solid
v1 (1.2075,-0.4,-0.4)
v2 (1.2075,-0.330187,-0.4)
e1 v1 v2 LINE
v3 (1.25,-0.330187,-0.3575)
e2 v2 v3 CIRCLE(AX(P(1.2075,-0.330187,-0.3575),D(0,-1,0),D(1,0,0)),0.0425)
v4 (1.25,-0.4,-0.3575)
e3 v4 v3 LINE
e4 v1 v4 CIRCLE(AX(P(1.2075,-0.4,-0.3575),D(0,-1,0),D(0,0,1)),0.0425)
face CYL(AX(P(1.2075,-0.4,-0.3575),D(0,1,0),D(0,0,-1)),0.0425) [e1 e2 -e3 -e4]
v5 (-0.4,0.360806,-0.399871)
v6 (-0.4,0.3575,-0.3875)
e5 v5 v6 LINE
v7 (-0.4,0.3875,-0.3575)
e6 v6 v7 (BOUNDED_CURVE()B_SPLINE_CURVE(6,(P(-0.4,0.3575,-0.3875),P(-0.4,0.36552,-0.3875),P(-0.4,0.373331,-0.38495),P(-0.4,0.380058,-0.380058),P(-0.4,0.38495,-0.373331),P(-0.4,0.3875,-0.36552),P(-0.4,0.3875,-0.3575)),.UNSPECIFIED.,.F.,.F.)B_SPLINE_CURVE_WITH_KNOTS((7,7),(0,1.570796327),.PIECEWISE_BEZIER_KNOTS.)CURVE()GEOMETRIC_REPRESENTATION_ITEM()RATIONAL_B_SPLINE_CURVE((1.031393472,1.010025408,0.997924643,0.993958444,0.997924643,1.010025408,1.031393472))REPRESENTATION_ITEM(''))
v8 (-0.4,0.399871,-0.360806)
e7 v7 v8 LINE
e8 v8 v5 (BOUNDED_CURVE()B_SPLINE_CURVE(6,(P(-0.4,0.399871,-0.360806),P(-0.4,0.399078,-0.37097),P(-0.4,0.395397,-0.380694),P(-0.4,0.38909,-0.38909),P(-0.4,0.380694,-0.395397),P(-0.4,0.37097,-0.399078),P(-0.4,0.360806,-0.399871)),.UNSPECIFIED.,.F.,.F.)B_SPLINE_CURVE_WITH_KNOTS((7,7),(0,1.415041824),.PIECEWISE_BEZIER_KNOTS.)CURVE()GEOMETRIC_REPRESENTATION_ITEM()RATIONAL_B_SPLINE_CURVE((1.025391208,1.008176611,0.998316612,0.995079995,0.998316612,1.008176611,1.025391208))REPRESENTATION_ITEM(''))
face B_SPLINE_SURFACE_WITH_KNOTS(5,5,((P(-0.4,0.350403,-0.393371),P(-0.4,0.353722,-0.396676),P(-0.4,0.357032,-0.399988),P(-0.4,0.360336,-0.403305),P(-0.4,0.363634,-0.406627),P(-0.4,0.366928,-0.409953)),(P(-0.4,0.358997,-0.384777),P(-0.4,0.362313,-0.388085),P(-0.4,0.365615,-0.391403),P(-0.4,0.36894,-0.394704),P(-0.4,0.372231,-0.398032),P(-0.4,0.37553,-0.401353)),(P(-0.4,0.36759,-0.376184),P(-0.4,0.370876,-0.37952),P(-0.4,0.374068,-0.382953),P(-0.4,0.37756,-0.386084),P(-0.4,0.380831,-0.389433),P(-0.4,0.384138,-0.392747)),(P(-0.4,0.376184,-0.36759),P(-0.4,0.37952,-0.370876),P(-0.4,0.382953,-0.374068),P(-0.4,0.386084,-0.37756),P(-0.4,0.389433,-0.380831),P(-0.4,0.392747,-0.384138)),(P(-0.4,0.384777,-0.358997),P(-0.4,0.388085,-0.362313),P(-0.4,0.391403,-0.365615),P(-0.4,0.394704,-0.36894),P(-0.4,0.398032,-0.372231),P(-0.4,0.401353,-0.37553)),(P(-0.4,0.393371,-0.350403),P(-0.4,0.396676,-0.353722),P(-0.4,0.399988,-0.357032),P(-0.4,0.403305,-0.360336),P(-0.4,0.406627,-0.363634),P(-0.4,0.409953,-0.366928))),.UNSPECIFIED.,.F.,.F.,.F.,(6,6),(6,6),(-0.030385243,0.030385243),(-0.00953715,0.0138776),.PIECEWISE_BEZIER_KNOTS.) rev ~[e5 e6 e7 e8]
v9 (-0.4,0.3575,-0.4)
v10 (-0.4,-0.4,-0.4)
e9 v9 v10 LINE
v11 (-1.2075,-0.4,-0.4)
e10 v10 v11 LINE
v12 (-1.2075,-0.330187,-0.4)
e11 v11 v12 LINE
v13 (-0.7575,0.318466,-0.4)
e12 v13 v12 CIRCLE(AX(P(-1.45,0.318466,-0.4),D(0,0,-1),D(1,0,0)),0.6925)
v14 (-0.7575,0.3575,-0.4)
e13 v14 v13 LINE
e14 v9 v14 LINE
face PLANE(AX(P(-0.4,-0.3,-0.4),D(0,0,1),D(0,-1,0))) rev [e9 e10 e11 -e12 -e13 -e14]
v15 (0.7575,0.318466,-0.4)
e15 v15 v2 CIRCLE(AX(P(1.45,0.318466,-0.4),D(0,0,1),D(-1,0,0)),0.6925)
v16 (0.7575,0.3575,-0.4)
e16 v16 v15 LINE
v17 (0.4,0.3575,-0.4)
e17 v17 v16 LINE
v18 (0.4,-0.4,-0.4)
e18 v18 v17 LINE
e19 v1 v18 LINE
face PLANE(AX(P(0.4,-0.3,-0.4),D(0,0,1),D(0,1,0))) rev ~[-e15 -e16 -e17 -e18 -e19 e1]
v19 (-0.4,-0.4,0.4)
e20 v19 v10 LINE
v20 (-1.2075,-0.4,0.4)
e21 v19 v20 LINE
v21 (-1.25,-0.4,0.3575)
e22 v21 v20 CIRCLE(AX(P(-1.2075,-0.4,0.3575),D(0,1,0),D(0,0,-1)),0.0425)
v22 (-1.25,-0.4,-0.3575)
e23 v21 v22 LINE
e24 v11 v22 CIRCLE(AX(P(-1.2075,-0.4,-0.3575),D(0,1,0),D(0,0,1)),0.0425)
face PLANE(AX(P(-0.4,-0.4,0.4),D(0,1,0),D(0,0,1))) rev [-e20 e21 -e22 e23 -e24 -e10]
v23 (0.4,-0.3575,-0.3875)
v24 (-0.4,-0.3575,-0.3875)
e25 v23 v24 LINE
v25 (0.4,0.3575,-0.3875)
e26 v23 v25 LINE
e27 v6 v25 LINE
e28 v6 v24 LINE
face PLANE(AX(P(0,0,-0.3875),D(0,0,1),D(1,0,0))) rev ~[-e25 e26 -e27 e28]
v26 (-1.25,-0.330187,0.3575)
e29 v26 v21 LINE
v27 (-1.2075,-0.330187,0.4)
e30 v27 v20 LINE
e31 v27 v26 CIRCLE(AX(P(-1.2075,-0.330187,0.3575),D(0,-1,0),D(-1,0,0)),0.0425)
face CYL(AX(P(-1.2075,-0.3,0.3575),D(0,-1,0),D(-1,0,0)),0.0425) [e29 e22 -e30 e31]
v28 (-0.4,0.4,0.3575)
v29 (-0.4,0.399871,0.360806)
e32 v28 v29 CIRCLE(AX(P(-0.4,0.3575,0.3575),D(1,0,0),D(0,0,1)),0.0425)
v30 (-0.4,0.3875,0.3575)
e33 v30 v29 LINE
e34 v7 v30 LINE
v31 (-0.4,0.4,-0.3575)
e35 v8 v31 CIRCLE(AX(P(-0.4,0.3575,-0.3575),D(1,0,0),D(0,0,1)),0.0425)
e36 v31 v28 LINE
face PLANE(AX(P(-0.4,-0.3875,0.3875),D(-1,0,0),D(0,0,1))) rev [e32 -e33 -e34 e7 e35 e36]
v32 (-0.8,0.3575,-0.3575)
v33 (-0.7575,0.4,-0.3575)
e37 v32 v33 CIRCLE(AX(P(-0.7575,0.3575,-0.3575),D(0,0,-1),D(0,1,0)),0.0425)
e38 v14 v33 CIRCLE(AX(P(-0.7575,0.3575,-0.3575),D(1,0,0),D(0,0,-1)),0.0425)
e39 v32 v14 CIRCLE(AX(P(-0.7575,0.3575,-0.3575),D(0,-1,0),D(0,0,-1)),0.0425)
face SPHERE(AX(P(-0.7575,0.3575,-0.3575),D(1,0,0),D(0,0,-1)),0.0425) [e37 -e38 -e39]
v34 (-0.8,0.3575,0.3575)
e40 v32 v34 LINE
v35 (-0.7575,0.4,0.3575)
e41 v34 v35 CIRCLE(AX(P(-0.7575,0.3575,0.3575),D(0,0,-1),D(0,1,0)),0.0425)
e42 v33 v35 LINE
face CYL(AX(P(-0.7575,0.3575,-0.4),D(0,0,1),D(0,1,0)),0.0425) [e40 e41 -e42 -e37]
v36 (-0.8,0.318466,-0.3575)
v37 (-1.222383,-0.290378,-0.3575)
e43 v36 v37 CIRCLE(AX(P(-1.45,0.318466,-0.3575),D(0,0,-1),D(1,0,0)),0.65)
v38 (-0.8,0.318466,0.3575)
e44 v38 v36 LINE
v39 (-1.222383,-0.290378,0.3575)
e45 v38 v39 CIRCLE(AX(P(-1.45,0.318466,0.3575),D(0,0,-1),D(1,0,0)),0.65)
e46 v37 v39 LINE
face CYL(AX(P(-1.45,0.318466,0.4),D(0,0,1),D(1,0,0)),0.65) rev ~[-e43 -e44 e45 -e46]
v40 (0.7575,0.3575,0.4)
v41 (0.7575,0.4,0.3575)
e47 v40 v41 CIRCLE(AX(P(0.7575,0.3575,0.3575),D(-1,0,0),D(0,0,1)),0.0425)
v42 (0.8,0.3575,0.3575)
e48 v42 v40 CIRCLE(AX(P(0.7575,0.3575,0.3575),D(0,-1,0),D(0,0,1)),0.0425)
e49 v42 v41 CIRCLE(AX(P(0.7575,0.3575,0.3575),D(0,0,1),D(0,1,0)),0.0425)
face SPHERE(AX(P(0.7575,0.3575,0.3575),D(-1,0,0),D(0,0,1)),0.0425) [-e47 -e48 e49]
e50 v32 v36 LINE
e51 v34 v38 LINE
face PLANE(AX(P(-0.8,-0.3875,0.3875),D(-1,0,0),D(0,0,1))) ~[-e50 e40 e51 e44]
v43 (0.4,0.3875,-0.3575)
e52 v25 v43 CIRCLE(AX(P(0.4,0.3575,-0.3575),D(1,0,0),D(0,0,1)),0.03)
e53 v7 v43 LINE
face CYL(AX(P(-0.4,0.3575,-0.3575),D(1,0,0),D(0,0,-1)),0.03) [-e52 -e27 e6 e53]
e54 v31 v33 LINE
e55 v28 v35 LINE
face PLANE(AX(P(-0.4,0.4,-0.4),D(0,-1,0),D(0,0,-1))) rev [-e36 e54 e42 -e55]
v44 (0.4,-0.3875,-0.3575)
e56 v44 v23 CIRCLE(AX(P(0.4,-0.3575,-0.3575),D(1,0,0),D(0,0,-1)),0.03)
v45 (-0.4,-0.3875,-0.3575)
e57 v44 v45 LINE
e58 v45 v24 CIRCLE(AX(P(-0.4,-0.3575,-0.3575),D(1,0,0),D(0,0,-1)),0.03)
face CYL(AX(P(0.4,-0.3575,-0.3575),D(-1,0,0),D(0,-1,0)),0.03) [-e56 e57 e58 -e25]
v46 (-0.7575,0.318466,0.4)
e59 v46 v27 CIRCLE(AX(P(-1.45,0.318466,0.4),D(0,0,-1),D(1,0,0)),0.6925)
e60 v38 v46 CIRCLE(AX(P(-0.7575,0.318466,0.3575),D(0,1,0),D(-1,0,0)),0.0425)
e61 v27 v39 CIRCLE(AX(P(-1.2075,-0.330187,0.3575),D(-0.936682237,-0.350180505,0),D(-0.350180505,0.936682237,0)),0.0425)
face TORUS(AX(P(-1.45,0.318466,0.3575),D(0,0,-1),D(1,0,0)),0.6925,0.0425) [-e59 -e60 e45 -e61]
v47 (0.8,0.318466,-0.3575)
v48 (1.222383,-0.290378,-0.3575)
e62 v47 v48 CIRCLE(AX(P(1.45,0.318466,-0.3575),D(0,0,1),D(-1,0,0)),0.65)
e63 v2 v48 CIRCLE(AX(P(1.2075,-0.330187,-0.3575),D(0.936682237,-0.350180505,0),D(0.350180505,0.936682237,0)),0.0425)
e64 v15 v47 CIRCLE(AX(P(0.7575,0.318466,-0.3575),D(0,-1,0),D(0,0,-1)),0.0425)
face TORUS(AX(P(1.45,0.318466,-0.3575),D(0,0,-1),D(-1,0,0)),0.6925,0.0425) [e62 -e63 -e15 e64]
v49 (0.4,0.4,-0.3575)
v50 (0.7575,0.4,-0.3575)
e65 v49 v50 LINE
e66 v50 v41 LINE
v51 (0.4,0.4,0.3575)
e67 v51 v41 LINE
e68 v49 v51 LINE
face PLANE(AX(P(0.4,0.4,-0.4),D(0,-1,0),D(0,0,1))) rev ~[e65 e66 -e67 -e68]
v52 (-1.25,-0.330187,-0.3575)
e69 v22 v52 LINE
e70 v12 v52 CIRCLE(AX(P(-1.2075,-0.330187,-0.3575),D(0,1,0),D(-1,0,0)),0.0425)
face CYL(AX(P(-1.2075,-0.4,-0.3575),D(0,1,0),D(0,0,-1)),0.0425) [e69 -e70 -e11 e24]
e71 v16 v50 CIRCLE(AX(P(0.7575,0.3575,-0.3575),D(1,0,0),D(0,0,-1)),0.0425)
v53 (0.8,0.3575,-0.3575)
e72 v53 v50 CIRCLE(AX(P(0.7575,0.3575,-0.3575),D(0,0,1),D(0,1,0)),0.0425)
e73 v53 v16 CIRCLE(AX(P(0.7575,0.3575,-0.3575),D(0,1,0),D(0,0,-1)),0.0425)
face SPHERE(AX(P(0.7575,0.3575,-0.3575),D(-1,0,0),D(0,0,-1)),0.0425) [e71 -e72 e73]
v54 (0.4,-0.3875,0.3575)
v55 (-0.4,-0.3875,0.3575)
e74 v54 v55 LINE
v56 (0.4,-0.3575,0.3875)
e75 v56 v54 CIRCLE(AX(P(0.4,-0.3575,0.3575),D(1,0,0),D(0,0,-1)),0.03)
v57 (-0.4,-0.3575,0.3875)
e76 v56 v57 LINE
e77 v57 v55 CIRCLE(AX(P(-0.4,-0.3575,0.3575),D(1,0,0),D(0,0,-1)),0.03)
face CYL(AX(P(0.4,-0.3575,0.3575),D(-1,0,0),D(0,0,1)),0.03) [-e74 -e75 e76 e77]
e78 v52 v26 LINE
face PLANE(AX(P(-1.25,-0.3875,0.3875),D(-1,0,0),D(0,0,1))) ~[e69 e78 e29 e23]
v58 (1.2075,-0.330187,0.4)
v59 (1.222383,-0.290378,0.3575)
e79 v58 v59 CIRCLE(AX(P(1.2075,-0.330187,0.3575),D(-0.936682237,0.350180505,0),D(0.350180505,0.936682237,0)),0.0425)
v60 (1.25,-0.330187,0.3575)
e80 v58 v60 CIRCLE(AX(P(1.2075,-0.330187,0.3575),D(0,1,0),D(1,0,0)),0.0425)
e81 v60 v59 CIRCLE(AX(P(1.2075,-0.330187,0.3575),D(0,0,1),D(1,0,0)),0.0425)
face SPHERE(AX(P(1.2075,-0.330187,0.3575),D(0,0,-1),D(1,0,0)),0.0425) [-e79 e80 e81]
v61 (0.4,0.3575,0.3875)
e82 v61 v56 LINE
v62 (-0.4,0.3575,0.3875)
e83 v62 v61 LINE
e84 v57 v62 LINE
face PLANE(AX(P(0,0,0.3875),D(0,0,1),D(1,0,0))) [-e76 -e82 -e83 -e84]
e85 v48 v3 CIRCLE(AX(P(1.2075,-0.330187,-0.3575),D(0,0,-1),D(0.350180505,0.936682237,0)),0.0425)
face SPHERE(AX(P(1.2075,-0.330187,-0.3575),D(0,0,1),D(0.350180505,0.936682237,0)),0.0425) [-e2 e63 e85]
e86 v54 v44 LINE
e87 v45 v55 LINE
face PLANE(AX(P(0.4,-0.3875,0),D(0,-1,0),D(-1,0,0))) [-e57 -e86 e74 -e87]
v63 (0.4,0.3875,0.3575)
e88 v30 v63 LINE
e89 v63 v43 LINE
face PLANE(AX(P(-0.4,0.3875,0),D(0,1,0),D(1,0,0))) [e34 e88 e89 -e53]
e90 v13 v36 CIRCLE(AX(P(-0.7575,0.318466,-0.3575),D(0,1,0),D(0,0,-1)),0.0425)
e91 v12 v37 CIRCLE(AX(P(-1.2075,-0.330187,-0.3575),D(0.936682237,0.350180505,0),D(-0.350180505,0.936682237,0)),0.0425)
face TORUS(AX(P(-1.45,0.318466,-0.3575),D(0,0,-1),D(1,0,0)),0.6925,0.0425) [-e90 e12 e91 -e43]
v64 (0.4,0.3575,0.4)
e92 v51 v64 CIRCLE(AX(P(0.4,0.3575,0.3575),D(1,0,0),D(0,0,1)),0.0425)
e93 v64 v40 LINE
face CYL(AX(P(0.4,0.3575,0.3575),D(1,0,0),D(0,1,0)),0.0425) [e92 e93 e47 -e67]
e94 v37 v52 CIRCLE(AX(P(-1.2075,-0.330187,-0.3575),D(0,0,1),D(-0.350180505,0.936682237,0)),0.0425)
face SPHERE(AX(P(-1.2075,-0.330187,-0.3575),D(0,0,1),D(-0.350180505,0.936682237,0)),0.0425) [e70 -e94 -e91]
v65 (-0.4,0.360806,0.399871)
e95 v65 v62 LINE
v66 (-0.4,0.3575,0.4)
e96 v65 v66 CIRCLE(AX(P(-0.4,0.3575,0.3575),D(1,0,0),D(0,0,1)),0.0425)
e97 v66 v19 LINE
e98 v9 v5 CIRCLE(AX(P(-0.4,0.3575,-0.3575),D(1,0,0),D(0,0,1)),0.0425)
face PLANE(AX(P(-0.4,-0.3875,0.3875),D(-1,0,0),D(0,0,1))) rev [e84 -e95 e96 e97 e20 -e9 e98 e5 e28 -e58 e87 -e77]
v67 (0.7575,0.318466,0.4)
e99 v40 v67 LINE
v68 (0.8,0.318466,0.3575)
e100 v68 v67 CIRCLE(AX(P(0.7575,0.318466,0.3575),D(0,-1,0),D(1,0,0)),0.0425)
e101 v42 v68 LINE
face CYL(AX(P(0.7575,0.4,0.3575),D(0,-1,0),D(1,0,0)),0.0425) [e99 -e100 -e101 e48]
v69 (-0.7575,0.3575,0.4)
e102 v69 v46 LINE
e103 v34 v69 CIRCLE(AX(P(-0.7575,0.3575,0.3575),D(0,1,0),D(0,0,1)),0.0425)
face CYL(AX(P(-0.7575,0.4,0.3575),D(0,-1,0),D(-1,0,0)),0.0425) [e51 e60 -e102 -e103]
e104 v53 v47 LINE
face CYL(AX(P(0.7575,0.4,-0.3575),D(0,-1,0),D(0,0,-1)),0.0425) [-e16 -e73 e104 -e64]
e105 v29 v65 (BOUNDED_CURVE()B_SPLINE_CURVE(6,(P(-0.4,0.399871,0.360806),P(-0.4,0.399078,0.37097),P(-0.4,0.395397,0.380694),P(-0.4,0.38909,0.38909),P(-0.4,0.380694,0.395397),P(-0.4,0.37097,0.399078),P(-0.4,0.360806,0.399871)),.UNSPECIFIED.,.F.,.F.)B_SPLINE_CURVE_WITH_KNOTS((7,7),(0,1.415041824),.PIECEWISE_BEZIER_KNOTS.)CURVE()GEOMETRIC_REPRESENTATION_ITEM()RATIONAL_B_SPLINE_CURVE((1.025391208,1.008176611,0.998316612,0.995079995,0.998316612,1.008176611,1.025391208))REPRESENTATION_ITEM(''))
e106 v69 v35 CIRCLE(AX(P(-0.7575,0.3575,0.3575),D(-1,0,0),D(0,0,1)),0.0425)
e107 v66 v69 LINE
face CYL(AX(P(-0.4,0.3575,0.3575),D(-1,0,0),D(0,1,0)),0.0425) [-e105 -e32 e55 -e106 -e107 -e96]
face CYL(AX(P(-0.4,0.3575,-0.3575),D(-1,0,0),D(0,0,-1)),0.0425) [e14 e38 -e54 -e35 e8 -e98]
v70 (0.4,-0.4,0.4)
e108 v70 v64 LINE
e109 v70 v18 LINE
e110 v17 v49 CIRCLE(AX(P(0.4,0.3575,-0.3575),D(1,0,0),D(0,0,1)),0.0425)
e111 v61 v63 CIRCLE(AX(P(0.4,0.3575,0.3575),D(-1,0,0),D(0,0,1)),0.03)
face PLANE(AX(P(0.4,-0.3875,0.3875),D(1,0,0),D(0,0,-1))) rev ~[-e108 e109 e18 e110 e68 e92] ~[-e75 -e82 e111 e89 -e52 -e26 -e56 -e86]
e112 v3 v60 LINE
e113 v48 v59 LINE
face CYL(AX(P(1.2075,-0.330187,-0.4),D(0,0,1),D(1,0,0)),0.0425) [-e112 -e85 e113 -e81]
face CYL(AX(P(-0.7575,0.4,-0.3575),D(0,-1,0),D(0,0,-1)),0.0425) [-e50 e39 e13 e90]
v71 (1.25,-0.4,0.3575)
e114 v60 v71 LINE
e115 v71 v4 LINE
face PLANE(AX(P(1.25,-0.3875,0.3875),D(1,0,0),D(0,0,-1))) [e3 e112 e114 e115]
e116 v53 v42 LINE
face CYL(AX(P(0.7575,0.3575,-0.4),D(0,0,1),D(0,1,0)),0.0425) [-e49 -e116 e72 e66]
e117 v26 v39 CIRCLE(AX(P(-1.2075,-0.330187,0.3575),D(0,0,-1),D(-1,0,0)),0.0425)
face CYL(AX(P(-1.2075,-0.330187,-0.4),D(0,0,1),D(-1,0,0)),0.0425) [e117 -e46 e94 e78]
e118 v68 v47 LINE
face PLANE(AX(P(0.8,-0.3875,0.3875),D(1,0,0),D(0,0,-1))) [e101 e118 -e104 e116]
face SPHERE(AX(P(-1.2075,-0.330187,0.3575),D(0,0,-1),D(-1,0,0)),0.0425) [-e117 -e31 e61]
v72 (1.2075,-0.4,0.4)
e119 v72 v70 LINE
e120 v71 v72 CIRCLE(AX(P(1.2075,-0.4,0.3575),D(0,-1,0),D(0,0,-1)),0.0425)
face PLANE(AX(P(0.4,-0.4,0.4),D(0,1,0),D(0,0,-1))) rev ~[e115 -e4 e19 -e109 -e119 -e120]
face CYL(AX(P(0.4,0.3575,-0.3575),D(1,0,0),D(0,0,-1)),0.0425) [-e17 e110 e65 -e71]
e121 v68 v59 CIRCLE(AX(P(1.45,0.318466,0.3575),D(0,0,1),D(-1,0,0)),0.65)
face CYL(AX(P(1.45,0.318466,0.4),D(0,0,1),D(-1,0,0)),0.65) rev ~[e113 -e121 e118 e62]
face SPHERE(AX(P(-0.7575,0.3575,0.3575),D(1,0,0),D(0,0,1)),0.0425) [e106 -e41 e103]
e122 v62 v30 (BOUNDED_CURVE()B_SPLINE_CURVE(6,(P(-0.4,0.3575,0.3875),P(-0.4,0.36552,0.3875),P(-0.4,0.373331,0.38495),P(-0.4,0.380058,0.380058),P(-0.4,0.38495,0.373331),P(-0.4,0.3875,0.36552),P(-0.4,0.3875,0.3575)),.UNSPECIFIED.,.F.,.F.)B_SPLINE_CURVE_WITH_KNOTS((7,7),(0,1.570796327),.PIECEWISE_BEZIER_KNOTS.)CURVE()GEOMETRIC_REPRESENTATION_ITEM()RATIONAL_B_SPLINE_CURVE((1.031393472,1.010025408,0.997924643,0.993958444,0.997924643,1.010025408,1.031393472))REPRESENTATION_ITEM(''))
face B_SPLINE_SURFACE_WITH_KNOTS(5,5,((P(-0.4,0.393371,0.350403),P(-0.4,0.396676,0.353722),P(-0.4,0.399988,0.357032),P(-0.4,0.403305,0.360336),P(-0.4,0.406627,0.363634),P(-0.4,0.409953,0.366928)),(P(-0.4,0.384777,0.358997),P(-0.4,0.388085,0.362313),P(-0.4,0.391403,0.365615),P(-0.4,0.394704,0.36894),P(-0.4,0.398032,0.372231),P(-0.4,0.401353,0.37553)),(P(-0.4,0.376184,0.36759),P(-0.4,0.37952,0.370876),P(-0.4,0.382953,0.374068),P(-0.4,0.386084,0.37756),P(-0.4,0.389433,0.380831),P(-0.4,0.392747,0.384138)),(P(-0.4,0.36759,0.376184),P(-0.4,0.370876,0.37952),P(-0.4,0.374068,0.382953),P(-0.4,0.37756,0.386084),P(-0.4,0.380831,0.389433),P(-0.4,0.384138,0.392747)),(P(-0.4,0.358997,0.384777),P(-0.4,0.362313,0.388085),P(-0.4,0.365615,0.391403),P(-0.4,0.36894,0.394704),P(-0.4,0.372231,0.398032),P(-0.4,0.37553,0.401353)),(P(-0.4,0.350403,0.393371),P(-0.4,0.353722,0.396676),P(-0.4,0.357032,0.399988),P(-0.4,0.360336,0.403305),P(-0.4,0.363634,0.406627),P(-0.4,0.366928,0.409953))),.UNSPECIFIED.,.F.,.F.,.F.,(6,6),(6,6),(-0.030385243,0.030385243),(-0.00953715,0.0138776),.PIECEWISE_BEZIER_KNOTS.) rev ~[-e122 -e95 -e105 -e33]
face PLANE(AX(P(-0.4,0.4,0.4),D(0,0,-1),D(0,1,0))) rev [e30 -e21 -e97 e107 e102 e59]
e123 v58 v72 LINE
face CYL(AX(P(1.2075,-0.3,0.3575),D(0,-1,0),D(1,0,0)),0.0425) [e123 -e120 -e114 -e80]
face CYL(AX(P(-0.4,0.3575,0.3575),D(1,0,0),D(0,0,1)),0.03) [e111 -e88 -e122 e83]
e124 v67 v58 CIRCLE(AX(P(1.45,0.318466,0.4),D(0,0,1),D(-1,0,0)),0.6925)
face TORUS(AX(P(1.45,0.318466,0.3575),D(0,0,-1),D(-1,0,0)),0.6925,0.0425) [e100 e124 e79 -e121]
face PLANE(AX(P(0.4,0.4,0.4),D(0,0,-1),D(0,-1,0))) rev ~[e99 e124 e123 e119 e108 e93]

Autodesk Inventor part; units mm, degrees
ref_plane "YZ Plane" through (0, 0, 0) normal (1, 0, 0) x (0, 1, 0)
ref_plane "XZ Plane" through (0, 0, 0) normal (0, 1, 0) x (-1, 0, 0)
ref_plane "XY Plane" through (0, 0, 0) normal (0, 0, 1) x (1, 0, 0)
sketch "Sketch10" plane through (0, 0, 0) normal (0, 0, 1) x (1, 0, 0)
  line L0 (-0.4, 0.3875) -> (0.4, 0.3875)
  line L1 (0.4, 0.3875) -> (0.4, -0.3875)
  line L2 (0.4, -0.3875) -> (-0.4, -0.3875)
  line L3 (-0.4, -0.3875) -> (-0.4, 0.3875)
  point P0 (0, 0)
  point P1 (-0.4, 0)
  point P2 (0, 0.3875)
  dimension "d7" = 0.8
  dimension "d8" = 0.775
extrude "Extrusion4" add sketch "Sketch10" along normal mid plane 0.775
sketch "Sketch11" plane through (0.4, -0.3875, 0.3875) normal (1, 0, 0) x (0, 0, -1)
  line L0 (0, 0.775) -> (0.775, 0.775) construction
  line L1 (0, 0) -> (0, 0.775) construction
  line L2 (0, 0) -> (0.775, 0) construction
  line L3 (0.775, 0.775) -> (0.775, 0) construction
  line L4 (0.7875, 0.7875) -> (-0.0125, 0.7875)
  line L5 (-0.0125, 0.7875) -> (-0.0125, -0.0125)
  line L6 (-0.0125, -0.0125) -> (0.7875, -0.0125)
  line L7 (0.7875, -0.0125) -> (0.7875, 0.7875)
  line L8 (-0.0125, -0.0125) -> (0.7875, -0.0125)
  line L9 (0.7875, -0.0125) -> (0.7875, 0.0875)
  line L10 (0.7875, 0.0875) -> (-0.0125, 0.0875)
  line L11 (-0.0125, 0.0875) -> (-0.0125, -0.0125)
  point P0 (0.3875, 0.3875)
  dimension "d11" = 0.8
  dimension "d14" = 0.1
extrude "Extrusion5" add sketch "Sketch11" along normal blind 0.4
extrude "Extrusion6" add sketch "Sketch11" along normal blind 0.85 contours L7 L6 L5 L10
fillet "Fillet1" radius 0.65 1 edges at (0.8, -0.3, 0)
fillet "Fillet2" radius 0.0425 10 edges at (0.6, 0.4, -0.4) (0.6, 0.4, 0.4) (0.8, 0.3592, 0.4) (0.9244, -0.064, 0.4) (0.8, 0.3592, -0.4) (0.9244, -0.064, -0.4) (1.25, -0.35, -0.4) (1.25, -0.3, 0) (0.8, 0.4, 0) (1.25, -0.35, 0.4)
mirror "Mirror1" about plane through (0, 0, 0) normal (1, 0, 0) of "Extrusion5", "Fillet1", "Fillet2", "Extrusion6"
fillet "Fillet3" radius 0.03 4 edges at (0, 0.3875, -0.3875) (0, 0.3875, 0.3875) (0, -0.3875, -0.3875) (0, -0.3875, 0.3875)
equation "\"d9\" = d8"
properties part number "BLM18PG471SN1D Ferrite Bead" material "Laminate, Ivory, Matte"
